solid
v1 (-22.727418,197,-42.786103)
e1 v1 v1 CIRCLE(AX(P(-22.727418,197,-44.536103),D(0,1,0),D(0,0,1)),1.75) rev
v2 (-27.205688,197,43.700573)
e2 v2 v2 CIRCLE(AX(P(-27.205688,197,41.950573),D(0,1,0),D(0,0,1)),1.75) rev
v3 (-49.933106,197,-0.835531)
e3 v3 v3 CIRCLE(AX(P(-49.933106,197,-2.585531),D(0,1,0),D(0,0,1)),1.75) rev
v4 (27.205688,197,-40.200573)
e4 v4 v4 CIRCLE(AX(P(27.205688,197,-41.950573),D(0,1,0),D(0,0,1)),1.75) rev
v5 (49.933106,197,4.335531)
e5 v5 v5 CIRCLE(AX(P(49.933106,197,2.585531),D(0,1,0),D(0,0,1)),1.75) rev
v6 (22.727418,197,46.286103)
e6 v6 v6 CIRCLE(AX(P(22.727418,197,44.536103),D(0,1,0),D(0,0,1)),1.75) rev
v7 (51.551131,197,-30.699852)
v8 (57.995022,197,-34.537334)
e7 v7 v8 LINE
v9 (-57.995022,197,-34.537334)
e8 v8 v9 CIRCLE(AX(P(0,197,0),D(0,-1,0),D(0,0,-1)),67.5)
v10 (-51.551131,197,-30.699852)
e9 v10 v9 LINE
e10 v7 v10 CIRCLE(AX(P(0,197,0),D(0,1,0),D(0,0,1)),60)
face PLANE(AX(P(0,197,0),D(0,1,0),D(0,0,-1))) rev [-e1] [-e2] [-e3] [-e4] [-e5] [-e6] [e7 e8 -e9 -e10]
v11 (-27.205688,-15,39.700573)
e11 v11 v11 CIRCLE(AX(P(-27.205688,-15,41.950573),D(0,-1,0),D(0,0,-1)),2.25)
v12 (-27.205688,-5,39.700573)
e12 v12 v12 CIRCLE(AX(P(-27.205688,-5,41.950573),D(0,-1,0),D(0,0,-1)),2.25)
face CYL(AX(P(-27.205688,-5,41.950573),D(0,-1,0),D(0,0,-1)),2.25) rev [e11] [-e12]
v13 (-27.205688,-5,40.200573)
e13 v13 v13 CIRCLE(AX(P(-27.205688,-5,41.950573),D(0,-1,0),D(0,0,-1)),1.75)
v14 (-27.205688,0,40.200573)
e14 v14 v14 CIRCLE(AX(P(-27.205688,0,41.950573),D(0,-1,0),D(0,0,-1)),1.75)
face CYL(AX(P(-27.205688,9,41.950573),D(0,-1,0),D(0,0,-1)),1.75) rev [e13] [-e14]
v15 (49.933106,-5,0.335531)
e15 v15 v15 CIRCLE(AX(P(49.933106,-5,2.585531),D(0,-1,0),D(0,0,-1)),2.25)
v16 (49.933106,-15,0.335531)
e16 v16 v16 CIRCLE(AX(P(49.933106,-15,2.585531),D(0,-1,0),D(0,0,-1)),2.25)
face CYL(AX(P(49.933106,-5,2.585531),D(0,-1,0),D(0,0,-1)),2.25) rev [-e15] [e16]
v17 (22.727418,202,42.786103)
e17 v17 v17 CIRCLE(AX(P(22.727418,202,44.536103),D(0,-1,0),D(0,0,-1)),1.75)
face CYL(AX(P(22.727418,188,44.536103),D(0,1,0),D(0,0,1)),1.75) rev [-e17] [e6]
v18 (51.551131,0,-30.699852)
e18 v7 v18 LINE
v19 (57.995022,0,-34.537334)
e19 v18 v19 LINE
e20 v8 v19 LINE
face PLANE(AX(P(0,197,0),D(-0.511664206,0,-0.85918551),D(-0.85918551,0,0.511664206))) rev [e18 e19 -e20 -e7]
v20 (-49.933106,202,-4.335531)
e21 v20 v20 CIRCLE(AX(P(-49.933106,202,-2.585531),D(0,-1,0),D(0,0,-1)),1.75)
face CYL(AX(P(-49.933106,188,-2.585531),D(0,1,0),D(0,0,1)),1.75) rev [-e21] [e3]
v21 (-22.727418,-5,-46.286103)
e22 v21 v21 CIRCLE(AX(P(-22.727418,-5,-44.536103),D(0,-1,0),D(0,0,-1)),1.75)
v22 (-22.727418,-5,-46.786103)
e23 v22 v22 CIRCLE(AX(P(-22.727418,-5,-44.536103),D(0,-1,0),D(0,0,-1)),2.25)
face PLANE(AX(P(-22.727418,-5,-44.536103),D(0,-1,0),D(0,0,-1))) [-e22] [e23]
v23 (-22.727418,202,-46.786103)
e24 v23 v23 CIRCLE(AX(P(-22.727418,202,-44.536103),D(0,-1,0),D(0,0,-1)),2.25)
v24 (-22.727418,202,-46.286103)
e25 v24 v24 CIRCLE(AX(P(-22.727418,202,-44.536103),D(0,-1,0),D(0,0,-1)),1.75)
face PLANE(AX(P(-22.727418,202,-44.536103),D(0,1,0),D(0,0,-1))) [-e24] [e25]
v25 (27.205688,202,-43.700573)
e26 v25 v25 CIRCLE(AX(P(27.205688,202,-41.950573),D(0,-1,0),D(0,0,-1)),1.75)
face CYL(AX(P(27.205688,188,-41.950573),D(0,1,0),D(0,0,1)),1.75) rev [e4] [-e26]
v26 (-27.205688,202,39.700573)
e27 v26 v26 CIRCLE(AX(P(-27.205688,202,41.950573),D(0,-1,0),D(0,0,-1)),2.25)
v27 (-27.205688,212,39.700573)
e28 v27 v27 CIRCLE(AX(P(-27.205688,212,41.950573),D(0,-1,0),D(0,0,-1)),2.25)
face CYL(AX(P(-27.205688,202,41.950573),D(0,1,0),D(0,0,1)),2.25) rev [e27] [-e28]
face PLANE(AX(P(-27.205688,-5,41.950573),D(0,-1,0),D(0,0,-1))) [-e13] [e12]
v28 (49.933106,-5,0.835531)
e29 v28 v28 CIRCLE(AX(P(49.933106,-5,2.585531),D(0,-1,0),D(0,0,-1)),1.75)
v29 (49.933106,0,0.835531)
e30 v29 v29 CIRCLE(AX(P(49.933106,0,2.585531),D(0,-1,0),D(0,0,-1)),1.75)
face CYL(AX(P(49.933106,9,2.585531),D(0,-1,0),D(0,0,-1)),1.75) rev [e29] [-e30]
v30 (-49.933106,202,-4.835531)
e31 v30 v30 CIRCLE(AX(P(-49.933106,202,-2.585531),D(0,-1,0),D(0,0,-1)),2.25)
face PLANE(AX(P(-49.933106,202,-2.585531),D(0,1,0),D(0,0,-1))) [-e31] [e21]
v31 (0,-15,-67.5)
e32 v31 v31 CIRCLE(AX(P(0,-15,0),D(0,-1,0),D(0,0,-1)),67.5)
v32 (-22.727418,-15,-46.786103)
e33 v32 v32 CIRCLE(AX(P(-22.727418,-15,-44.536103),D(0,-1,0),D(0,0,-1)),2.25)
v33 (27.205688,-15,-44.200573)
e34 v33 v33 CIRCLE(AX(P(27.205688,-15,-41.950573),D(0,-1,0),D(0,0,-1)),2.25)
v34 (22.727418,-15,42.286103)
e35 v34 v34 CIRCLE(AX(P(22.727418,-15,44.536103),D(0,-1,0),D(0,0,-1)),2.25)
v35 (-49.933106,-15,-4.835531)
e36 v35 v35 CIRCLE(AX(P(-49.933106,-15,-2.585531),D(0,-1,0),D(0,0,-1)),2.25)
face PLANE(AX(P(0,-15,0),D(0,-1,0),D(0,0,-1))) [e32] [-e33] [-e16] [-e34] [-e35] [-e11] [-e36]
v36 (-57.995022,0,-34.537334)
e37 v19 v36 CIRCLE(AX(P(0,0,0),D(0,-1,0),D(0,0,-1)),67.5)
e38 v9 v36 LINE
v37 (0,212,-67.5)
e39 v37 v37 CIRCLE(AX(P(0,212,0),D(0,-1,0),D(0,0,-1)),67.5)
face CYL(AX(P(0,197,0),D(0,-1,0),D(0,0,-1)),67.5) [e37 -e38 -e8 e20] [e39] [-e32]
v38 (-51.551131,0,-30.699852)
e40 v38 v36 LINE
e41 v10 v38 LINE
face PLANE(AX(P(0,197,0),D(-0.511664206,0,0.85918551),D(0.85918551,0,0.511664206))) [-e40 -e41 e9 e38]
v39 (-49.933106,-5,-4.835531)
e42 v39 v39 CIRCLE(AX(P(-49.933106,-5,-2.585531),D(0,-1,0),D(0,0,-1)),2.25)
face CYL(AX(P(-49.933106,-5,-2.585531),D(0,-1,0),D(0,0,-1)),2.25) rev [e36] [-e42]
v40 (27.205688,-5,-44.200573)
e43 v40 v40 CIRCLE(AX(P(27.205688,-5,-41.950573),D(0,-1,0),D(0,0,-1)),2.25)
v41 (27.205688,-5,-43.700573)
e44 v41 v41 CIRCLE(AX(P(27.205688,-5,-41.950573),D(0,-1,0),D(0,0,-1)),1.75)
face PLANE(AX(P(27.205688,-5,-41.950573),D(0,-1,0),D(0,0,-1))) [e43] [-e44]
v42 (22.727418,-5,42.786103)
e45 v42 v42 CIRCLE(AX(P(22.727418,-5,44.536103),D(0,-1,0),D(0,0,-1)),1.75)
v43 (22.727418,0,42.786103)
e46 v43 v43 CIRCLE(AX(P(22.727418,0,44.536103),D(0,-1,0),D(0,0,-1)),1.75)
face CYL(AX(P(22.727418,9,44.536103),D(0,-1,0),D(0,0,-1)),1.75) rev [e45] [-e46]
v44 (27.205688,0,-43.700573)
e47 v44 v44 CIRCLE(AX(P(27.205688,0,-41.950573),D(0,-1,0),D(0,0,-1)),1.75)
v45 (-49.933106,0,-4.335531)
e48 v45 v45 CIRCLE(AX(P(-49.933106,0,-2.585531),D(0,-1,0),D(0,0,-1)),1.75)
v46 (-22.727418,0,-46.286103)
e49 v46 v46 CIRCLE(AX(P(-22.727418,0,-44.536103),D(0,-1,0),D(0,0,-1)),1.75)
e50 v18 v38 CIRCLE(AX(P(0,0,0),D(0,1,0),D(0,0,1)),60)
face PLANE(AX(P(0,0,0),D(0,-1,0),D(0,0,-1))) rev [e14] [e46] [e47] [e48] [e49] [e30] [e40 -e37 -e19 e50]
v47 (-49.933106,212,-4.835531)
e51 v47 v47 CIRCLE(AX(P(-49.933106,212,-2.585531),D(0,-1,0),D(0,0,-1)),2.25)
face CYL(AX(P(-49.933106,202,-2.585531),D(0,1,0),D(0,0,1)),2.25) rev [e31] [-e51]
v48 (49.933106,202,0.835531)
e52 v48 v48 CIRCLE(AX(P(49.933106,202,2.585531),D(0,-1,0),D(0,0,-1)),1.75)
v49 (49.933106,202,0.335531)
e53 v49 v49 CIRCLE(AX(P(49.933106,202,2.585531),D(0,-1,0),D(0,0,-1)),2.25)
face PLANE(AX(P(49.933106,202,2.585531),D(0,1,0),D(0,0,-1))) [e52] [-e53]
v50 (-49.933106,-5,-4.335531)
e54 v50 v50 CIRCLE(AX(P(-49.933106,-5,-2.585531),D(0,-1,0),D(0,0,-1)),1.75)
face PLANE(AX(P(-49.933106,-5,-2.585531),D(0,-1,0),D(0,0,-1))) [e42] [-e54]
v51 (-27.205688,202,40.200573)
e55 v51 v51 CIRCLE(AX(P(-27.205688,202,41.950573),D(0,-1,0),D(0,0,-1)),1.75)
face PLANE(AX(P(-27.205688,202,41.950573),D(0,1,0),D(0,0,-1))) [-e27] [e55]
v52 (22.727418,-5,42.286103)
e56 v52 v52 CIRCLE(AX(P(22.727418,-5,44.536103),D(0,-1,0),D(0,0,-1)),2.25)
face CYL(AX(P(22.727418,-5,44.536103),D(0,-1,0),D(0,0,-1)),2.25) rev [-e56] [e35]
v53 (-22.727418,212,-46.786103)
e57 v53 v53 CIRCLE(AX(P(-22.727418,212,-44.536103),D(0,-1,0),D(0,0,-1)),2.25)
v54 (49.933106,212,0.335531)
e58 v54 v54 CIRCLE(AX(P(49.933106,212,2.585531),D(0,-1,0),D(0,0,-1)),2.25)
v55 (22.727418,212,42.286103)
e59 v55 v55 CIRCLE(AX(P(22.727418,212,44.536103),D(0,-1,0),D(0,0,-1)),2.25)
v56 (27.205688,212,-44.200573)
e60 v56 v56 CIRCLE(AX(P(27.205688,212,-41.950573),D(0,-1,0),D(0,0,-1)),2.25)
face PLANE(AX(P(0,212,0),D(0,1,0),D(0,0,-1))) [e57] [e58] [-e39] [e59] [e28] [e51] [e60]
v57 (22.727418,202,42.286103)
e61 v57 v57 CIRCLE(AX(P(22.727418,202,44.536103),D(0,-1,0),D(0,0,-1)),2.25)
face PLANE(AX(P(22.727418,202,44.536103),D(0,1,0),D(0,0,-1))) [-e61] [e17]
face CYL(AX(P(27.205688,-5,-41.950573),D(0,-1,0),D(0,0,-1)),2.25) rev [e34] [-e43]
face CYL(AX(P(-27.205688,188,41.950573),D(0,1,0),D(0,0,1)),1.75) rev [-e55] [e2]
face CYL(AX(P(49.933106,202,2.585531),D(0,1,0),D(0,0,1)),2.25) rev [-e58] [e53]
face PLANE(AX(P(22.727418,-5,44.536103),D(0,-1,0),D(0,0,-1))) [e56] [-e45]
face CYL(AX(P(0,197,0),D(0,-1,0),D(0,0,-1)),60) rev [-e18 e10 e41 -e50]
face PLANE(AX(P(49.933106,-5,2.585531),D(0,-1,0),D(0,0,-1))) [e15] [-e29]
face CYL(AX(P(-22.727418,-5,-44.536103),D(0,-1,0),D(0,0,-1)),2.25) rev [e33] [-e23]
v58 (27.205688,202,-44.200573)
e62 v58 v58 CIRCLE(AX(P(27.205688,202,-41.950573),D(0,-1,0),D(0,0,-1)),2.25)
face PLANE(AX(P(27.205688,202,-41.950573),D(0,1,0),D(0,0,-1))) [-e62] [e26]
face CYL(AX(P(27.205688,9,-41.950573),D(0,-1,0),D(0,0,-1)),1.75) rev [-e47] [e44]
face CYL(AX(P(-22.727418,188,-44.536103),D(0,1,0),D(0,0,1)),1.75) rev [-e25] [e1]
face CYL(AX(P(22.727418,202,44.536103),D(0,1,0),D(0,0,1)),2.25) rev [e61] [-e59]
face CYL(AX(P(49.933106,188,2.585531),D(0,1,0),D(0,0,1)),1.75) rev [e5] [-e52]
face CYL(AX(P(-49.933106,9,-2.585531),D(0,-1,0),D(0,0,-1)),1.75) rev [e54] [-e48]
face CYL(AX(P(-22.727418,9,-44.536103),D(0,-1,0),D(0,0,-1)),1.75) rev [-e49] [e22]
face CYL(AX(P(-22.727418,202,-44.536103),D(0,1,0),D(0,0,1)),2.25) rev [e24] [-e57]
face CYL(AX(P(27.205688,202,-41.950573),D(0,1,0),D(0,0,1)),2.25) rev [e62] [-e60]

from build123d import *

# Parameters (mm, degrees)
BOSS_EXTRUDE1_DEPTH = 197
BOSS_EXTRUDE2_START = 15
SKETCH2_R           = 67.5
BOSS_EXTRUDE2_DEPTH = 15
SKETCH3_R           = 2.25
CUT_EXTRUDE1_DEPTH  = 10
SKETCH4_R           = 1.75
CUT_EXTRUDE2_DEPTH  = 14


with BuildPart() as part:
    # Sketch1 → Boss-Extrude1 (new body)
    with BuildSketch(Plane(origin=(0, 0, 0), x_dir=(1, 0, 0), z_dir=(0, 1, 0))):
        with BuildLine():
            Line((-57.995021896, 34.537333935), (-51.551130574, 30.699852387))
            ThreePointArc((-51.551130574, 30.699852387), (0, 60), (51.551130574, 30.699852387))
            Line((51.551130574, 30.699852387), (57.995021896, 34.537333935))
            ThreePointArc((57.995021896, 34.537333935), (0, 67.5), (-57.995021896, 34.537333935))
        make_face()
    boss_extrude1 = extrude(amount=BOSS_EXTRUDE1_DEPTH)

    # Sketch2 → Boss-Extrude2 (add)
    with BuildSketch(Plane.XZ.offset(BOSS_EXTRUDE2_START)):
        Circle(SKETCH2_R)
    boss_extrude2 = extrude(amount=-BOSS_EXTRUDE2_DEPTH)

    # Sketch3 → Cut-Extrude1 (cut)
    with BuildSketch(Plane.XZ.offset(15)):
        with Locations((22.727417579, 44.536103222)):
            Circle(SKETCH3_R)
        with Locations((49.933105565, 2.585530625)):
            Circle(SKETCH3_R)
        with Locations((27.205687986, -41.950572597)):
            Circle(SKETCH3_R)
        with Locations((-22.727417579, -44.536103222)):
            Circle(SKETCH3_R)
        with Locations((-49.933105565, -2.585530625)):
            Circle(SKETCH3_R)
        with Locations((-27.205687986, 41.950572597)):
            Circle(SKETCH3_R)
    cut_extrude1 = extrude(amount=-CUT_EXTRUDE1_DEPTH, mode=Mode.SUBTRACT)

    # Sketch4 → Cut-Extrude2 (cut)
    with BuildSketch(Plane.XZ.offset(5)):
        with Locations((22.727417579, 44.536103222)):
            Circle(SKETCH4_R)
        with Locations((49.933105565, 2.585530625)):
            Circle(SKETCH4_R)
        with Locations((27.205687986, -41.950572597)):
            Circle(SKETCH4_R)
        with Locations((-22.727417579, -44.536103222)):
            Circle(SKETCH4_R)
        with Locations((-49.933105565, -2.585530625)):
            Circle(SKETCH4_R)
        with Locations((-27.205687986, 41.950572597)):
            Circle(SKETCH4_R)
    cut_extrude2 = extrude(amount=-CUT_EXTRUDE2_DEPTH, mode=Mode.SUBTRACT)

    # Mirror1: Boss-Extrude1, Boss-Extrude2, Cut-Extrude1 across plane
    add(boss_extrude1.mirror(Plane.ZX.offset(98.5)))
    add(boss_extrude2.mirror(Plane.ZX.offset(98.5)))
    add(cut_extrude1.mirror(Plane.ZX.offset(98.5)), mode=Mode.SUBTRACT)

    # Mirror2: Cut-Extrude2 across plane
    add(cut_extrude2.mirror(Plane.ZX.offset(98.5)), mode=Mode.SUBTRACT)


solid = part.part
